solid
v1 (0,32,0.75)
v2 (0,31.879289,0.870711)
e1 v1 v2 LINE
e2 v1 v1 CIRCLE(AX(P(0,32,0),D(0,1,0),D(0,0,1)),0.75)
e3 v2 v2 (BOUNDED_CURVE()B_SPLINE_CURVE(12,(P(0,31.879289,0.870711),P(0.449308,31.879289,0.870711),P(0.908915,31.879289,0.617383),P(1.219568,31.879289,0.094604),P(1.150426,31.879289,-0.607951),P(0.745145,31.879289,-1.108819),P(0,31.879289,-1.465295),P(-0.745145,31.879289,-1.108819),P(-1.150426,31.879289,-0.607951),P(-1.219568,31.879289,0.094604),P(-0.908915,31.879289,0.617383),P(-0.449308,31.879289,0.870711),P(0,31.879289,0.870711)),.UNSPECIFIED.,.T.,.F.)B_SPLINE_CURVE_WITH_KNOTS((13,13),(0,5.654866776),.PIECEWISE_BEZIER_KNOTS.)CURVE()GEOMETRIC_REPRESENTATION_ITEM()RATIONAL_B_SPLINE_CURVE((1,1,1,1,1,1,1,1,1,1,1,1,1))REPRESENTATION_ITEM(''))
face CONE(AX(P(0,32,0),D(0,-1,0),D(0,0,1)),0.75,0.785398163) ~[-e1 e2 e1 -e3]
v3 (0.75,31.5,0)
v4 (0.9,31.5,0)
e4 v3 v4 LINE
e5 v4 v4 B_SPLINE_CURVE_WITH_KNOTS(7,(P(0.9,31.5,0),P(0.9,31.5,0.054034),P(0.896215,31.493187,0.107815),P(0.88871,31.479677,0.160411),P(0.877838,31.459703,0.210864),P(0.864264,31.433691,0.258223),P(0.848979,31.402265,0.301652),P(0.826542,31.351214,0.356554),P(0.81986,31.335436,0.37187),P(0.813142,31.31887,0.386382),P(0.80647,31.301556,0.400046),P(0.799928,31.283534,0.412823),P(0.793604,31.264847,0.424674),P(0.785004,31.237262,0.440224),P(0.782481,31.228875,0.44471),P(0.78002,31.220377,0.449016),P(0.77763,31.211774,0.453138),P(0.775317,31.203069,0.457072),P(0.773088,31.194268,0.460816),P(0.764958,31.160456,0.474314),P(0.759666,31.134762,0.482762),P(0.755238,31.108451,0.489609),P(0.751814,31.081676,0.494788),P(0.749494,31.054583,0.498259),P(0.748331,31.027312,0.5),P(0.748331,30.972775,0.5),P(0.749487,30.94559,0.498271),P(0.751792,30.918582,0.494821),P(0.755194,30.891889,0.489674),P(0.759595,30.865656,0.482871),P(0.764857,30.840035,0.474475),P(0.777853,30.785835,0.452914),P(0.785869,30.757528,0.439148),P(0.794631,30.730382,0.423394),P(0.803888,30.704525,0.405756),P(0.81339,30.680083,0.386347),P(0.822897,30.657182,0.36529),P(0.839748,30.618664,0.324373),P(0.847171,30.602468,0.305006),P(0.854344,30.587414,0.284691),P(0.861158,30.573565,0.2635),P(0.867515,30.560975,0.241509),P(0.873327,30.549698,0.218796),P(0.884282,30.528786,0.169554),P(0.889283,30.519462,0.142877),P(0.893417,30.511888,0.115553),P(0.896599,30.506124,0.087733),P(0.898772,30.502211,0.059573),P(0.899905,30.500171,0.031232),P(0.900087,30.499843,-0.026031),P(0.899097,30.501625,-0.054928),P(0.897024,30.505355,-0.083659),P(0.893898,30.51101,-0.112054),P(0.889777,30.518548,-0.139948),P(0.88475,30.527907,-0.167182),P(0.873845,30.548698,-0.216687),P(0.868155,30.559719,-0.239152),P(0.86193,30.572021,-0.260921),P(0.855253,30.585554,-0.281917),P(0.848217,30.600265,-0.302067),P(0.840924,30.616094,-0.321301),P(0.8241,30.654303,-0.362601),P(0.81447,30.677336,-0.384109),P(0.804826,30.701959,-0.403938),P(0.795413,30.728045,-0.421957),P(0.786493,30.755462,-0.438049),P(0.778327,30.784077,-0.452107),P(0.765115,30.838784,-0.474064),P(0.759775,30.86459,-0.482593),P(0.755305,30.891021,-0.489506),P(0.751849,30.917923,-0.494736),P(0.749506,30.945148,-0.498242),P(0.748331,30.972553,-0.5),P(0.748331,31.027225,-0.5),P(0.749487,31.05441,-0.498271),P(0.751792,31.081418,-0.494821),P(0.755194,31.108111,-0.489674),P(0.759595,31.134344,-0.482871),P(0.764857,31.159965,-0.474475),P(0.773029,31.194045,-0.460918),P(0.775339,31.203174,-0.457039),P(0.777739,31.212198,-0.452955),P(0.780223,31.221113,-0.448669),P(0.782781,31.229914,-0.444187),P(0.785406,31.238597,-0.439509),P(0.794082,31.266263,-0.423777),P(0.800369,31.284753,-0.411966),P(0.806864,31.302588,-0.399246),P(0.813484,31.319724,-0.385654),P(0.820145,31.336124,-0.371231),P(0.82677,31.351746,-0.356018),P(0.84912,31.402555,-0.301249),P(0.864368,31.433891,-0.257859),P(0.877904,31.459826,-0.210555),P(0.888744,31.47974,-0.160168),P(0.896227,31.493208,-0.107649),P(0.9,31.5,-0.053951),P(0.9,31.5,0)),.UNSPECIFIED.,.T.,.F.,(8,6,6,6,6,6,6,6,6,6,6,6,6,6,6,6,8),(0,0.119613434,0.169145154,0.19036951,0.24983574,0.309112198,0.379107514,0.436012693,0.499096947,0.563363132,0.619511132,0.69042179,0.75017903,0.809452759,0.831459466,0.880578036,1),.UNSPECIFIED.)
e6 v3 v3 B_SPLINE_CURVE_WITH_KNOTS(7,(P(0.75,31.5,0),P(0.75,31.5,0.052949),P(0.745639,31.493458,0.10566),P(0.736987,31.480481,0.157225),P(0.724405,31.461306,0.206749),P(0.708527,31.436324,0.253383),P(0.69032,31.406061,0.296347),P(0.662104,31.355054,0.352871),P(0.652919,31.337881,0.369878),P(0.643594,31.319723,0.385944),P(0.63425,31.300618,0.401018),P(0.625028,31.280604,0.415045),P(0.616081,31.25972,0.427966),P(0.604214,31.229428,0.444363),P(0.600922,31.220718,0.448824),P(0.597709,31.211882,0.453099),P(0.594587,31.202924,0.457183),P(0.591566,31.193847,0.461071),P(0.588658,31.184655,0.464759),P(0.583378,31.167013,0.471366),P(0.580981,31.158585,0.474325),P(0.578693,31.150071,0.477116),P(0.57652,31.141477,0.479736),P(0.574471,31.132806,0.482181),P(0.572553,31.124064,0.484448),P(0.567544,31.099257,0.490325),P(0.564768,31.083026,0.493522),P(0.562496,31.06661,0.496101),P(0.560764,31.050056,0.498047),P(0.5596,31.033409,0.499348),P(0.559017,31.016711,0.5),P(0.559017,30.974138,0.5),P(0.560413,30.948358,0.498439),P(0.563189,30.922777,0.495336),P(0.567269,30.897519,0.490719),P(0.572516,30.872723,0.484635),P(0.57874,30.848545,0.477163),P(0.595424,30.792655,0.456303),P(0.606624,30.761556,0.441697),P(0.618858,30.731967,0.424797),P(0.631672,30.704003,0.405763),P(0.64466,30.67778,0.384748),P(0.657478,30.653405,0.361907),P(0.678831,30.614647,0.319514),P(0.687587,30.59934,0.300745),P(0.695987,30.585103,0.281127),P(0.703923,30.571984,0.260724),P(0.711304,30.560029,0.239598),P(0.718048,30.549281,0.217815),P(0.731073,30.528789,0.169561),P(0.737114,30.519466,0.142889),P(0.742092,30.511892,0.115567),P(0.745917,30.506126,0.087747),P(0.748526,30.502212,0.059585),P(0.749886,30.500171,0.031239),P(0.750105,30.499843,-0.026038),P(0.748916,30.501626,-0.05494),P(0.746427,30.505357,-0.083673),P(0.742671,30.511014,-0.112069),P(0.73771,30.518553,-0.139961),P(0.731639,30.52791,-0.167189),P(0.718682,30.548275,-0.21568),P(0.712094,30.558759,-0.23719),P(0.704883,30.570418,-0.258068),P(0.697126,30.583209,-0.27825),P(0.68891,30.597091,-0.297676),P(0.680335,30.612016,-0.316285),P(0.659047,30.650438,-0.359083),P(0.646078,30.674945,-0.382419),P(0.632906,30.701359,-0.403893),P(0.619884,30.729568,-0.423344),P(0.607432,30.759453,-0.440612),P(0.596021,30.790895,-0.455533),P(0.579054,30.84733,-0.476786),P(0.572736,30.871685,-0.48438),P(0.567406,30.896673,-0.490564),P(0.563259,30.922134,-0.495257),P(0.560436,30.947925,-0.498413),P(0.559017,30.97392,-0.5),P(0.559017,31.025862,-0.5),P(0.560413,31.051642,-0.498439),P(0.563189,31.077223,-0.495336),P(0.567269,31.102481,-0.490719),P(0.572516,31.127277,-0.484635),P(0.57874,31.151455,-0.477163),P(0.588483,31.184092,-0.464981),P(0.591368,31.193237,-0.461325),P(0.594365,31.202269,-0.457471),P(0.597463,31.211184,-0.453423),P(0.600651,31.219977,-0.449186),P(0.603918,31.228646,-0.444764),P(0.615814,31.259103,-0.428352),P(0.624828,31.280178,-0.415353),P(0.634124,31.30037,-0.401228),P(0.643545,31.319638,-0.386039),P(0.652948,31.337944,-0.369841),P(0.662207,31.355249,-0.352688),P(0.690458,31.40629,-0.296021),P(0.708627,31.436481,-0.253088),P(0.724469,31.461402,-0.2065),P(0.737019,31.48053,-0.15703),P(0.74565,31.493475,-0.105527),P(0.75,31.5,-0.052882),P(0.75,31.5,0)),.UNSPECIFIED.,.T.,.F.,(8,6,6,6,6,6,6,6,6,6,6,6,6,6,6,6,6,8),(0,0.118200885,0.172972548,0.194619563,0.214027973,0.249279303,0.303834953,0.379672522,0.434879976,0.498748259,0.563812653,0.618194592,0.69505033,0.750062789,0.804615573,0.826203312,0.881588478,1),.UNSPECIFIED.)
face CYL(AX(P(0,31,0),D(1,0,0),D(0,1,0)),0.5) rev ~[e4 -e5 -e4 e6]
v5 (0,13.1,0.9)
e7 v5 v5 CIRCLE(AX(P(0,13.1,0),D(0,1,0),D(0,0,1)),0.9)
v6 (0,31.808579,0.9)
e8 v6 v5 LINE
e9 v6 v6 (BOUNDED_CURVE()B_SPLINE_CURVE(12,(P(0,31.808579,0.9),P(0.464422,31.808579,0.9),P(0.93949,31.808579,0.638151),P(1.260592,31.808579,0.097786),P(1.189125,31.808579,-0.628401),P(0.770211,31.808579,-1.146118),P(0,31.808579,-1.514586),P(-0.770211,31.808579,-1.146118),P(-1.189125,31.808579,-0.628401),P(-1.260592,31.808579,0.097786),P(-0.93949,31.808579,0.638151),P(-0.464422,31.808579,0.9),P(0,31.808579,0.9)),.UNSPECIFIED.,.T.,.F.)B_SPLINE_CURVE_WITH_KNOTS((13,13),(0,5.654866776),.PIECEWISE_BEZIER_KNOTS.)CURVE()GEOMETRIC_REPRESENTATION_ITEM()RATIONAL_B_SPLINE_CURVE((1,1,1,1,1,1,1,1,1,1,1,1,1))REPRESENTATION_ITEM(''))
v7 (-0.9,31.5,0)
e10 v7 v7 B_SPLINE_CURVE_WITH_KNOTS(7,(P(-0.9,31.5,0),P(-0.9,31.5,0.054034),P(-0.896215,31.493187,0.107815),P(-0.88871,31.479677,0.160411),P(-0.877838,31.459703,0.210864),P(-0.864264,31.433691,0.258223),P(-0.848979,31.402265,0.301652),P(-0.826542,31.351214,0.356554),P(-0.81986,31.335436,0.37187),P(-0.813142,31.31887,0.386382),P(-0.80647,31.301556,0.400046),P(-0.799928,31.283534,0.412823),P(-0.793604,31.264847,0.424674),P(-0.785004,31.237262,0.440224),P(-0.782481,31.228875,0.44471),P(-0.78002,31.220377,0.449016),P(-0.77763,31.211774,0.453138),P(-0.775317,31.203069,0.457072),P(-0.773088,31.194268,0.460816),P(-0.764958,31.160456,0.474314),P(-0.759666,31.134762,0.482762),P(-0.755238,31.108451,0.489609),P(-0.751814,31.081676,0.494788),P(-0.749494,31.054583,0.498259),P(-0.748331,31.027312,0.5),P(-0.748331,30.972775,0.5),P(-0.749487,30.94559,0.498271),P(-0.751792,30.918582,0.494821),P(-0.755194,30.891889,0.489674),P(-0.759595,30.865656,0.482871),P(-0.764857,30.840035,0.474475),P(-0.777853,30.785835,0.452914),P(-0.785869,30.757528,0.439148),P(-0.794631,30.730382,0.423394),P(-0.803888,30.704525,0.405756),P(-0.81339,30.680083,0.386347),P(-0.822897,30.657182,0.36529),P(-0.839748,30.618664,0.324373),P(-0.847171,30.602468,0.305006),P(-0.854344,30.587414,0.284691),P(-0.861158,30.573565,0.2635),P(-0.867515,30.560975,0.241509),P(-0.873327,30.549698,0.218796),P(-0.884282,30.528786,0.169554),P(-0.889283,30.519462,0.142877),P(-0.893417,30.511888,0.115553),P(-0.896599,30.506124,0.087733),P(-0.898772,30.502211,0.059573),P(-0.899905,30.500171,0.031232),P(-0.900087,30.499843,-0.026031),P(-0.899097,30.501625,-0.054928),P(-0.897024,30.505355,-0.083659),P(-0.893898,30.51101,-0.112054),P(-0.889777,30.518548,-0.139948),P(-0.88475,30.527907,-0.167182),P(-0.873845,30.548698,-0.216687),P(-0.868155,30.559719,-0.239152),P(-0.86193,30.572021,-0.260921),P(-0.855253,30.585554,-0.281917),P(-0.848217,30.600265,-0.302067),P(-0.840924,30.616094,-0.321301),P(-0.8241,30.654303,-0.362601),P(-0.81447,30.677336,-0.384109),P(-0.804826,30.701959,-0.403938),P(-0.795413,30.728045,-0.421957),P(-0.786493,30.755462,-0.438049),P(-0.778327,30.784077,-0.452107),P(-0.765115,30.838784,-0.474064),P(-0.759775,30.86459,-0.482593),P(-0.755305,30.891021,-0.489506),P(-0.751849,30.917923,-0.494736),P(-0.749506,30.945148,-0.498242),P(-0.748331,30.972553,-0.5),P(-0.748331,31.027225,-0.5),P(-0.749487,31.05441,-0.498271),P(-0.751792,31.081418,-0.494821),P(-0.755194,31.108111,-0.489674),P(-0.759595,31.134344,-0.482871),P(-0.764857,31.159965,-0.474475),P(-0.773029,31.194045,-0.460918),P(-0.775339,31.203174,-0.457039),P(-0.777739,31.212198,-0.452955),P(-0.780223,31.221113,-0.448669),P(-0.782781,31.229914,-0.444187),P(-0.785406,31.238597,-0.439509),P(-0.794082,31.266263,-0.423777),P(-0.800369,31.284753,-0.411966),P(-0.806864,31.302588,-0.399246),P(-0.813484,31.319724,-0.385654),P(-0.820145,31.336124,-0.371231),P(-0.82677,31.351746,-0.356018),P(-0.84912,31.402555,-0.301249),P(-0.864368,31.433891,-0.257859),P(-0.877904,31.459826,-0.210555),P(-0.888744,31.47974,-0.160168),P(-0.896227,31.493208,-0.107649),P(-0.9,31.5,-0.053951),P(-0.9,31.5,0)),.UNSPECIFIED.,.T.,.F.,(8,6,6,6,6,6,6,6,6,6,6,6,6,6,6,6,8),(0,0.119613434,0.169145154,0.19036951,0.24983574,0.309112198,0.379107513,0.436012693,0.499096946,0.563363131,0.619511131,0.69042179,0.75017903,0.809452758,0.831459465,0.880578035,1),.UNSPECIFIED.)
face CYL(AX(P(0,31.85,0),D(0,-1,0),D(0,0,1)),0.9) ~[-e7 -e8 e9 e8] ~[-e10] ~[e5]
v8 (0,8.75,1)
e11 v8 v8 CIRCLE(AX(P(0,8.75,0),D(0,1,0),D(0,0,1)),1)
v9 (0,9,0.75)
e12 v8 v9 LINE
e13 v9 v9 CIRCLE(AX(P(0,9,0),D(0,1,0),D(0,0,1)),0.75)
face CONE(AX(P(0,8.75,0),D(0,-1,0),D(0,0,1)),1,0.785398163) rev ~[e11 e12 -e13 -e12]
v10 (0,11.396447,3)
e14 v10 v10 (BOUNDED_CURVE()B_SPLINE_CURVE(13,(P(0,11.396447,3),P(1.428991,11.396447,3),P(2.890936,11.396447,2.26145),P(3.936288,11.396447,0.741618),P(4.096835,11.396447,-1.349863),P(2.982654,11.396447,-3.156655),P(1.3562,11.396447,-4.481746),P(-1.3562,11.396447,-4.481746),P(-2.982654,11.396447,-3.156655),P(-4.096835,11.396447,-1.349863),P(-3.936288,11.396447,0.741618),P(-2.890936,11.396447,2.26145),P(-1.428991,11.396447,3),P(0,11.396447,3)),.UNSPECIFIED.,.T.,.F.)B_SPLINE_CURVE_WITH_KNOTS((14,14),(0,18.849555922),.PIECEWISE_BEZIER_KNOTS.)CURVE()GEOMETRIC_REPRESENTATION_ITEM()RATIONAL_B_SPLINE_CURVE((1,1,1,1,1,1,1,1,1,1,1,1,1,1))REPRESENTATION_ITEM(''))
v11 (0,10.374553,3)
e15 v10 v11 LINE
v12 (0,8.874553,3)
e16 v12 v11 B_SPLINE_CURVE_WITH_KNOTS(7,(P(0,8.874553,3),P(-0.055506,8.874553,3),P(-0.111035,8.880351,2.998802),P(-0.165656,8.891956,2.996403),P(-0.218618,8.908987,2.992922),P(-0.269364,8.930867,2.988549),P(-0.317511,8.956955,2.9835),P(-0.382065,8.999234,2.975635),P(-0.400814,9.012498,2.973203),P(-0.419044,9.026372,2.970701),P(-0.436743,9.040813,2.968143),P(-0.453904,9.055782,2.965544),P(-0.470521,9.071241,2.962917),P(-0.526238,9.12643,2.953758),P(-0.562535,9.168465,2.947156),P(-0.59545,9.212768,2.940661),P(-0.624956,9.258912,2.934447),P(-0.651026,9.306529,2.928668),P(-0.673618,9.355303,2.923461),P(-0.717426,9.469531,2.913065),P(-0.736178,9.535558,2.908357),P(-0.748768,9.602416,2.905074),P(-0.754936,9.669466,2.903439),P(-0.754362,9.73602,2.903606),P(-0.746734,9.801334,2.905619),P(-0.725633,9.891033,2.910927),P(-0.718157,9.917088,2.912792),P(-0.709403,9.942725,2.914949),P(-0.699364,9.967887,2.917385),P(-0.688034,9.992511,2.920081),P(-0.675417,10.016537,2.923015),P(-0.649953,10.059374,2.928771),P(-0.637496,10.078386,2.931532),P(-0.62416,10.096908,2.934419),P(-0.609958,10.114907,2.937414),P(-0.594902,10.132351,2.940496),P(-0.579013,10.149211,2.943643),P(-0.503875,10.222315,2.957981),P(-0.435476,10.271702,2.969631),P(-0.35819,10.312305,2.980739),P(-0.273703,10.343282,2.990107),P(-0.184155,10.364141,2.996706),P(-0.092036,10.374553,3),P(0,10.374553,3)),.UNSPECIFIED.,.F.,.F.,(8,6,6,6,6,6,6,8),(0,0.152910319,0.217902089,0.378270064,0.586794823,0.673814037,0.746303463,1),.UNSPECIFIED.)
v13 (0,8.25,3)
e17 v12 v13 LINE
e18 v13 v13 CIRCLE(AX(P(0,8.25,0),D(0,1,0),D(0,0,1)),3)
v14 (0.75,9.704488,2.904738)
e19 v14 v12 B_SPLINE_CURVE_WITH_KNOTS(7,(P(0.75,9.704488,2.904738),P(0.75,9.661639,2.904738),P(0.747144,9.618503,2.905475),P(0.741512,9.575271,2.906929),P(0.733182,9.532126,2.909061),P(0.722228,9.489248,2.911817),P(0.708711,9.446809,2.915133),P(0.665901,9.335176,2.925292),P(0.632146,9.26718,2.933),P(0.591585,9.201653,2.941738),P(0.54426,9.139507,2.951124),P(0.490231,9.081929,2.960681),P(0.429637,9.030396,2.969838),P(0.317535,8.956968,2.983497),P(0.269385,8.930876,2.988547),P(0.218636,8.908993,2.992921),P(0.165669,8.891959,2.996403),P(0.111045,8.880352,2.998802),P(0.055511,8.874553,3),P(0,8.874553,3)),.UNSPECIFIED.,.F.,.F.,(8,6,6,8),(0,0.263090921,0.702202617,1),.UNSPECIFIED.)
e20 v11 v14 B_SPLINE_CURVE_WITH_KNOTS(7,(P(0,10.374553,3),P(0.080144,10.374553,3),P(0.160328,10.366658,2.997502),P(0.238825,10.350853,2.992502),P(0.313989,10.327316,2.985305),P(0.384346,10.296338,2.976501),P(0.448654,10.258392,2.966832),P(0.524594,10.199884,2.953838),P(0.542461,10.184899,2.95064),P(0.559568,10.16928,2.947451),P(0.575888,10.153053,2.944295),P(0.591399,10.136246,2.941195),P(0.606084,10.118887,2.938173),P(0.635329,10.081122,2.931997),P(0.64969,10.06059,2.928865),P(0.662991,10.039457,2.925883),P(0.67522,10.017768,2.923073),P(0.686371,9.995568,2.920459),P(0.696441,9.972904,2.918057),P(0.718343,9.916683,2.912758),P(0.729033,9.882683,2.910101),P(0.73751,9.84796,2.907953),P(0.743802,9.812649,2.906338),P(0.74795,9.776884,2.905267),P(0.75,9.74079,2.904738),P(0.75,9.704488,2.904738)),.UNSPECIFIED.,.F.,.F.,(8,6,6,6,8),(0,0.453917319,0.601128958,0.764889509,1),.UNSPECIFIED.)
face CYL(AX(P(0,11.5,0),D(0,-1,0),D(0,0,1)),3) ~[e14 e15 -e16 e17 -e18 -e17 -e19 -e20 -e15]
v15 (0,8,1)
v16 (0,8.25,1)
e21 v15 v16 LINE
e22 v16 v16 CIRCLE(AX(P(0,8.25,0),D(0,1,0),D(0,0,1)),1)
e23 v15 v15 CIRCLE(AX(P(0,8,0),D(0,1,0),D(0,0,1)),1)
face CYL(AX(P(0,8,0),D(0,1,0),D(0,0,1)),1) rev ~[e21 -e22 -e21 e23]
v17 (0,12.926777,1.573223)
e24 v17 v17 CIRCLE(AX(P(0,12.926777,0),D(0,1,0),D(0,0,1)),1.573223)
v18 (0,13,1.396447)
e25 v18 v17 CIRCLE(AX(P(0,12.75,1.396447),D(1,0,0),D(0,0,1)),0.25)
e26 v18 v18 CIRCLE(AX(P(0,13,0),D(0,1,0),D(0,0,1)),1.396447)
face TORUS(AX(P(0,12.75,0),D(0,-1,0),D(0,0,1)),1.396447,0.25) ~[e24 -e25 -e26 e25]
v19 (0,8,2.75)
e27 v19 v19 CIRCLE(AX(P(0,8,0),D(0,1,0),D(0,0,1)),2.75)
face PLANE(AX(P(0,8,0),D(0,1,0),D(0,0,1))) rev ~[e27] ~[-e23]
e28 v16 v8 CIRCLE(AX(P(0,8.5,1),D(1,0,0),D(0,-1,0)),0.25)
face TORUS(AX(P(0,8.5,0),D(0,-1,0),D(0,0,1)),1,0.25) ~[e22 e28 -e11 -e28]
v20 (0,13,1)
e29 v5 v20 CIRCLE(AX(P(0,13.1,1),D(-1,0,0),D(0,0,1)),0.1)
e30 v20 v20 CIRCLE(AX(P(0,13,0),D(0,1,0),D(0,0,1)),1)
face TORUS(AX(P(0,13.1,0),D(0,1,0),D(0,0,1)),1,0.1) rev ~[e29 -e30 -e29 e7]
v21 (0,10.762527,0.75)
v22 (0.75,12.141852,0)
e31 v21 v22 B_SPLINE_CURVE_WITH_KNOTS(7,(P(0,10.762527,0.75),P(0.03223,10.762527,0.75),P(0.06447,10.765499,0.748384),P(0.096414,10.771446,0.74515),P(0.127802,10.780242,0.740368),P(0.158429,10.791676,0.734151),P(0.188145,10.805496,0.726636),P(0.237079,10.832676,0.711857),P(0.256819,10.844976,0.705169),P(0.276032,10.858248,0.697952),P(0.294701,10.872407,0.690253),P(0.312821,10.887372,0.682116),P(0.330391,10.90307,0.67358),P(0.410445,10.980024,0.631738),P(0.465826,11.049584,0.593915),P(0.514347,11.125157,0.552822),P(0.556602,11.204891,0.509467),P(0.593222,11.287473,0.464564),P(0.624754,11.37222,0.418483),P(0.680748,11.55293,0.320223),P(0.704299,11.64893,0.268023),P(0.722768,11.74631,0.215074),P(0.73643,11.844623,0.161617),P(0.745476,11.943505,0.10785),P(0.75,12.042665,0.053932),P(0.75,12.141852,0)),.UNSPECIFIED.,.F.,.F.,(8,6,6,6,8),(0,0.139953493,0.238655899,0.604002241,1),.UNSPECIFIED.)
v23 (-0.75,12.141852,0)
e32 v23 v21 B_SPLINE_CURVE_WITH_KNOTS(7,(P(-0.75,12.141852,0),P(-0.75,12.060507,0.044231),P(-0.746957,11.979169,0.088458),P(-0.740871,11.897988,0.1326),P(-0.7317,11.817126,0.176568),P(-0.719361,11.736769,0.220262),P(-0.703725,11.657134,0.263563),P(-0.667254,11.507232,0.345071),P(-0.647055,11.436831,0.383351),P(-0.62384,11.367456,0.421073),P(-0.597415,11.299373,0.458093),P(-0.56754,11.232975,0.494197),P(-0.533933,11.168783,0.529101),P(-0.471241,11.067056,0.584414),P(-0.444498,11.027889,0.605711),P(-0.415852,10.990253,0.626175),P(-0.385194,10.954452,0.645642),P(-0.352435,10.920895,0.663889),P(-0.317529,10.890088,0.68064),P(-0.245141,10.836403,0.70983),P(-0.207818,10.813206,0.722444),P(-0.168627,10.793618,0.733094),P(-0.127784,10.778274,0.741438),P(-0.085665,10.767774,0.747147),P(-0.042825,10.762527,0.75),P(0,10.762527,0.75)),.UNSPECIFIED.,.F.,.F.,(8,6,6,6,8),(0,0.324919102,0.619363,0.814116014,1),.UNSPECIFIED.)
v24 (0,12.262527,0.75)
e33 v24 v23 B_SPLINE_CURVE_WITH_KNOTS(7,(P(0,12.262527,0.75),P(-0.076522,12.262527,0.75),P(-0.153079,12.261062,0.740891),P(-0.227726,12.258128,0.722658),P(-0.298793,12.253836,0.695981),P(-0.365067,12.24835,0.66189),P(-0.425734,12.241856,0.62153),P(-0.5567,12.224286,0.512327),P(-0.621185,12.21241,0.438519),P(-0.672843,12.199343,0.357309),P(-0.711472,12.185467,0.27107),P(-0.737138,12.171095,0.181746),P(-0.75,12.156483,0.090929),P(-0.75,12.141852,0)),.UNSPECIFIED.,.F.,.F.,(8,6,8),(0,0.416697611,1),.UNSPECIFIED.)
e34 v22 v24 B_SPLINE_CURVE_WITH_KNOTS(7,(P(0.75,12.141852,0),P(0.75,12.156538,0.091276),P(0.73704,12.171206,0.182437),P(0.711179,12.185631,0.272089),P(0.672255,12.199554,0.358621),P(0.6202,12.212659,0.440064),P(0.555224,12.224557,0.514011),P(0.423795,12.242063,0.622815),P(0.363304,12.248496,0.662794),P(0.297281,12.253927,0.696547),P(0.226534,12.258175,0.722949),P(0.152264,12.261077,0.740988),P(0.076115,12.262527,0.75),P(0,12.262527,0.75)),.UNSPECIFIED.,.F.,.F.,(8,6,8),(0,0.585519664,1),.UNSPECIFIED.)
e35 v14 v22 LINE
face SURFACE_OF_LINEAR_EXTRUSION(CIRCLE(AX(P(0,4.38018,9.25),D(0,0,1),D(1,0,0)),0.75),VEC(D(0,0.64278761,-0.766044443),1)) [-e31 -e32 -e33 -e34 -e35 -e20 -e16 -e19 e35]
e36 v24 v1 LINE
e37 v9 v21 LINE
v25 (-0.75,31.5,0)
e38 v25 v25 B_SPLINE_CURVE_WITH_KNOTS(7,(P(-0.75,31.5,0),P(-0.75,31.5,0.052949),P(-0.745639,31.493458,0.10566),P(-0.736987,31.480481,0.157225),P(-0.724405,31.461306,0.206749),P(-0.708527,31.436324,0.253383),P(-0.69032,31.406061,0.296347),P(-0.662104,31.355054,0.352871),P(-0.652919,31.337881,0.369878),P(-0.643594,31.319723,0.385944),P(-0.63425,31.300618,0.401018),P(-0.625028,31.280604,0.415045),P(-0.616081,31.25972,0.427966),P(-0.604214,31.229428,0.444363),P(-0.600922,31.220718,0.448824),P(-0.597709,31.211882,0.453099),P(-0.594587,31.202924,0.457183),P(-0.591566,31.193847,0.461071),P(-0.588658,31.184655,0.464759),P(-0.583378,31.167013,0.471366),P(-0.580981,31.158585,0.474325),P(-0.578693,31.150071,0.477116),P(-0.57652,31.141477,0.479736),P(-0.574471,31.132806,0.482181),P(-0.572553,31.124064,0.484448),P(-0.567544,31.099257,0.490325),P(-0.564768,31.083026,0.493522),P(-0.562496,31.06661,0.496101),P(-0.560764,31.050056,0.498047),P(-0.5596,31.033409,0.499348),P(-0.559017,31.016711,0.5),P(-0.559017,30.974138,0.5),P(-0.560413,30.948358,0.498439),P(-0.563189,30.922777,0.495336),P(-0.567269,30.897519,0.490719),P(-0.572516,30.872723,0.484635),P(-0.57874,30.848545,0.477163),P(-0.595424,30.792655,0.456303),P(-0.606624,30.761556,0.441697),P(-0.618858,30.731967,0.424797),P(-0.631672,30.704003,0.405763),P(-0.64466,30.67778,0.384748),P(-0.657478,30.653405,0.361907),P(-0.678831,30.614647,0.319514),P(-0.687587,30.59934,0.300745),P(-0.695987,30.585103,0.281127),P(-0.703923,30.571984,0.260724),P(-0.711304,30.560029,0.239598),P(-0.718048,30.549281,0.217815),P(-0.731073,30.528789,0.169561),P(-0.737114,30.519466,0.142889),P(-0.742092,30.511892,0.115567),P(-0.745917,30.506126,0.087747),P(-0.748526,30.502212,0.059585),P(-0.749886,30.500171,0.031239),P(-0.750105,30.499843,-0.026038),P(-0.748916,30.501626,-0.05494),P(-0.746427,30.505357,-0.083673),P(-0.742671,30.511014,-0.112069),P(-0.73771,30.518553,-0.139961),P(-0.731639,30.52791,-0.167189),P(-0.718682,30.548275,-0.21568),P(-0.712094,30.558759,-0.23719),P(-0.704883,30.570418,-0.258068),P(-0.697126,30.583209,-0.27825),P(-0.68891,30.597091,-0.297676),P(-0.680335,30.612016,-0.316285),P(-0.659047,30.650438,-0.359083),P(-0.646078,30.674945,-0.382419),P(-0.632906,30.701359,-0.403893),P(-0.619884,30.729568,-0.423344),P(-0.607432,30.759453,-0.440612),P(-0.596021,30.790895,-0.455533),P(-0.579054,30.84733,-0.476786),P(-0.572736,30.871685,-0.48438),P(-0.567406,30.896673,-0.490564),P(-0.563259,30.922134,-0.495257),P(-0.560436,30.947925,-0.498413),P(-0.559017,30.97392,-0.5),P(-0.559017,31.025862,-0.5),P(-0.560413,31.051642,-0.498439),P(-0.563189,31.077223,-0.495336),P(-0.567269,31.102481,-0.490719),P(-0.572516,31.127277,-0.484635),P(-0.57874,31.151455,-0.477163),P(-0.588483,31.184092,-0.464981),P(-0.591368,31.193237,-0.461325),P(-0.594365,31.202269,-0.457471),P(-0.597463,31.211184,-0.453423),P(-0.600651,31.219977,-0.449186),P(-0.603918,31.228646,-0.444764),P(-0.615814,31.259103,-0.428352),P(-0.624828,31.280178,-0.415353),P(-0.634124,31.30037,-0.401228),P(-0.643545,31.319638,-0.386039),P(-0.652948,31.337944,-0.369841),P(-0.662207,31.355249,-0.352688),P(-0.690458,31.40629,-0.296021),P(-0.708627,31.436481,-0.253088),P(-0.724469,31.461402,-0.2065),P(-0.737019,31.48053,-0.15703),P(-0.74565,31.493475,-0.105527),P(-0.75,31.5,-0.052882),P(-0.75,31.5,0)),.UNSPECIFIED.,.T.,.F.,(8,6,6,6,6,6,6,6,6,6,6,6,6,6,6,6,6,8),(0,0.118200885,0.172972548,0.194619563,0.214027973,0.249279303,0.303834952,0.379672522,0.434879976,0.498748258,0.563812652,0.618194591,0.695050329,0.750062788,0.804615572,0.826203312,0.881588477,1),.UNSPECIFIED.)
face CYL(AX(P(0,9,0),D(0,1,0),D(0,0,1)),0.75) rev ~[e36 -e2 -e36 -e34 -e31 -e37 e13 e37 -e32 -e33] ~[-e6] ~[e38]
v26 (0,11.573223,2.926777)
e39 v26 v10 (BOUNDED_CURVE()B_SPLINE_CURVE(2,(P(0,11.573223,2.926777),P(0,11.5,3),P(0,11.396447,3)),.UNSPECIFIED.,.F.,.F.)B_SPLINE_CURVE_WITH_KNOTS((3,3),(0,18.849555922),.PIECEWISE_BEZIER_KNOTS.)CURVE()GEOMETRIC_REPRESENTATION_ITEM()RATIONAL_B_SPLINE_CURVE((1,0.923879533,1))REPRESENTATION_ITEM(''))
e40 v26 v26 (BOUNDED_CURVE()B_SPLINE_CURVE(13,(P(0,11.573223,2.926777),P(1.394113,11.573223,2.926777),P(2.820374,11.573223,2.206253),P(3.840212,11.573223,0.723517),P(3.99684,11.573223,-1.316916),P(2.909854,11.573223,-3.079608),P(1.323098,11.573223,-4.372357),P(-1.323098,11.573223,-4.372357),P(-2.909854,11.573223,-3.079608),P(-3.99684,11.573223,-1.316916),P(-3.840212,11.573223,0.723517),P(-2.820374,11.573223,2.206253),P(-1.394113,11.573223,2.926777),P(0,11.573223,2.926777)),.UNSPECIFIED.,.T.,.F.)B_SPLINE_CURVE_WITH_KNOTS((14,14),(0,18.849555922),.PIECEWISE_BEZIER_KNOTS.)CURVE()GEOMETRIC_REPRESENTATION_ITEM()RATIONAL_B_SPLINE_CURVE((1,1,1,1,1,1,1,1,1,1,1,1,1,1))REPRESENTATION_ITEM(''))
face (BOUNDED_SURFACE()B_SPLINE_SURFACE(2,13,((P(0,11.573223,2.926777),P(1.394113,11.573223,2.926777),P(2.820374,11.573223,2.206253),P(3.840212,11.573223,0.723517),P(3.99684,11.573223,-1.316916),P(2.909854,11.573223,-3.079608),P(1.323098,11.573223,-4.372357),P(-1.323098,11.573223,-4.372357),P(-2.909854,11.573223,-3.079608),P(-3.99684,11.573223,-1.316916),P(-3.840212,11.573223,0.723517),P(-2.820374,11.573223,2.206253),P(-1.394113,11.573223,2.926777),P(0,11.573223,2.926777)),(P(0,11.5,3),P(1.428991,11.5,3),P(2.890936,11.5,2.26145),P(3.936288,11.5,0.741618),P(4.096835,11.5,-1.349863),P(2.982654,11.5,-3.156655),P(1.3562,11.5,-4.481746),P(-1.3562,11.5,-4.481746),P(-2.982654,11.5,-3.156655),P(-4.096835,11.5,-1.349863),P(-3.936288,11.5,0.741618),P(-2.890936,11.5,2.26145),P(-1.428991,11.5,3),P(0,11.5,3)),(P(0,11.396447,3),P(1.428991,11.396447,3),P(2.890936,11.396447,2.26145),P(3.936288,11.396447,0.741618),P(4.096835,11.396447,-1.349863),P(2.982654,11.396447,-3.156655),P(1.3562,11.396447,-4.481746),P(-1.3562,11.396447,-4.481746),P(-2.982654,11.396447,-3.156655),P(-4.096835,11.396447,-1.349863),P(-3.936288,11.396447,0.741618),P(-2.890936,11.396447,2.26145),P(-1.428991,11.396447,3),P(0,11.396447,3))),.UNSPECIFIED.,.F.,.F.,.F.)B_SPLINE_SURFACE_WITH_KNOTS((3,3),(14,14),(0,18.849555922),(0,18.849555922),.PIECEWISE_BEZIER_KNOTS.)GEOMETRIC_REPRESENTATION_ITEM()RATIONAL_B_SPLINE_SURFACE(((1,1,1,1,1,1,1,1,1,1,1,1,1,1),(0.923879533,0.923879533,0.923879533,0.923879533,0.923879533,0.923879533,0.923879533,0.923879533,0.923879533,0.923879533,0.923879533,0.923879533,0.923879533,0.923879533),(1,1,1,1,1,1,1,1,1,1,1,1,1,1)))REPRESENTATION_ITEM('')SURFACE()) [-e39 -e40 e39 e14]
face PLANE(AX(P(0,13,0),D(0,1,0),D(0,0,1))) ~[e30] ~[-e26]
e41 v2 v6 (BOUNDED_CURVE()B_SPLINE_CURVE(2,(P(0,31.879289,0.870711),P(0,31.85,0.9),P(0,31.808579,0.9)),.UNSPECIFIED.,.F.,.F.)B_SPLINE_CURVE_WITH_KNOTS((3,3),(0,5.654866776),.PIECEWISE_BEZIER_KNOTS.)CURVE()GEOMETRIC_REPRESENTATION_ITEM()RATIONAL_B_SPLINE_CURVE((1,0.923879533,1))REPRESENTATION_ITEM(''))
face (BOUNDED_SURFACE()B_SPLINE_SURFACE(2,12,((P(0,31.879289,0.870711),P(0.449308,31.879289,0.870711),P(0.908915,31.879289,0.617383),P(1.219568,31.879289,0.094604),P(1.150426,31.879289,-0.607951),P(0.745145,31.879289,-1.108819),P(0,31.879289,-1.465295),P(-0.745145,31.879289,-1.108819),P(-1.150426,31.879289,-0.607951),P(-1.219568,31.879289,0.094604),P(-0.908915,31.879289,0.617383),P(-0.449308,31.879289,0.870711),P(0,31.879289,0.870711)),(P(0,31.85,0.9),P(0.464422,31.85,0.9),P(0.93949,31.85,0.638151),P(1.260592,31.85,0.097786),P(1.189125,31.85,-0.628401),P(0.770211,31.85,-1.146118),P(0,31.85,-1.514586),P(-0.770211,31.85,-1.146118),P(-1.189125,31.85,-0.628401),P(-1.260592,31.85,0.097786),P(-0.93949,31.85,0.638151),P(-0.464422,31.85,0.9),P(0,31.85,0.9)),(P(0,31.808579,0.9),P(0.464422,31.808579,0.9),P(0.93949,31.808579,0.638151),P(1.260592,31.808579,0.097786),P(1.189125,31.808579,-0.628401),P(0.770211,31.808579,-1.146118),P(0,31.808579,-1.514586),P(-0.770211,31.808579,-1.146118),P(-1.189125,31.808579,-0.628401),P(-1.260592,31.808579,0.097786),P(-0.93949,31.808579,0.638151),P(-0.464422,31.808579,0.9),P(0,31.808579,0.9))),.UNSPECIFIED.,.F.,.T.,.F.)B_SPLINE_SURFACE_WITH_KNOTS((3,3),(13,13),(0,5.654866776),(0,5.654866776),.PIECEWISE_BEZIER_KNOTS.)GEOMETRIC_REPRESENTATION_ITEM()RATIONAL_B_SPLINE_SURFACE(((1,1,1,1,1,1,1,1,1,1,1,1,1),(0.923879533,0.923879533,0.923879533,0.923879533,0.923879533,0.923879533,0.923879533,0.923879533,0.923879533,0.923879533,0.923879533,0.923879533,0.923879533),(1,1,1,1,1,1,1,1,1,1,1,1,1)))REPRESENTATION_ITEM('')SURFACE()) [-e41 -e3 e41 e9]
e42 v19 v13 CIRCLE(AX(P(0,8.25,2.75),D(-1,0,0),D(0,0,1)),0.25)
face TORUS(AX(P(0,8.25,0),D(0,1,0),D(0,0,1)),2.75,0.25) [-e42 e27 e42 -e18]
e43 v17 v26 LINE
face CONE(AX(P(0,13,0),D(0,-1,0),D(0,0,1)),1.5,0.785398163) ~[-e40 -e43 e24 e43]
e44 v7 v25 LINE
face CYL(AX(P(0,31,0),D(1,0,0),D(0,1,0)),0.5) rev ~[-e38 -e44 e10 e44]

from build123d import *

# Parameters (mm, degrees)
F3_R     = 0.1
F4_R     = 0.25
F6_R     = 0.75
F8_R     = 0.5
F9_DEPTH = 2.5


with BuildPart() as f2:
    # F0 (on Right) → F2 (revolve)
    with BuildSketch(Plane.YZ):
        with BuildLine():
            Line((11.5, 3), (8, 3))
            Line((8, 3), (8, 1))
            Line((8, 1), (8.25, 1))
            ThreePointArc((8.25, 1), (8.5, 0.75), (8.75, 1))
            Line((8.75, 1), (9, 0.75))
            Line((9, 0.75), (32, 0.75))
            Line((32, 0.75), (31.85, 0.9))
            Line((31.85, 0.9), (13, 0.9))
            Line((13, 0.9), (13, 1.5))
            Line((13, 1.5), (11.5, 3))
        make_face()
    revolve(axis=Axis((0, 17.771827057, 0), (0, 1, 0)))

    # F3
    f3_edges = [f2.edges().sort_by_distance(p)[0] for p in [
        (0, 31.85, -0.9),
        (0, 13, -0.9),
    ]]
    fillet(f3_edges, radius=F3_R)

    # F4
    f4_edges = [f2.edges().sort_by_distance(p)[0] for p in [
        (0, 13, -1.5),
        (0, 11.5, -3),
        (0, 8, -3),
    ]]
    fillet(f4_edges, radius=F4_R)

    # F7: sweep along a path in F5
    with BuildLine(Plane.YZ) as f7_path:
        Line((3.6301804626, 10), (11.391852051, 0.75))
    # F6 (on Top) → F7 (sweep, cut)
    with BuildSketch(Plane.XY):
        with Locations((0, 12.141852051)):
            Circle(F6_R)
    sweep(path=f7_path.line, mode=Mode.SUBTRACT)

    # F8 (on Right) → F9 (cut, symmetric)
    with BuildSketch(Plane.YZ):
        with Locations((31, 0)):
            Circle(F8_R)
    extrude(amount=F9_DEPTH, both=True, mode=Mode.SUBTRACT)


solid = f2.part
